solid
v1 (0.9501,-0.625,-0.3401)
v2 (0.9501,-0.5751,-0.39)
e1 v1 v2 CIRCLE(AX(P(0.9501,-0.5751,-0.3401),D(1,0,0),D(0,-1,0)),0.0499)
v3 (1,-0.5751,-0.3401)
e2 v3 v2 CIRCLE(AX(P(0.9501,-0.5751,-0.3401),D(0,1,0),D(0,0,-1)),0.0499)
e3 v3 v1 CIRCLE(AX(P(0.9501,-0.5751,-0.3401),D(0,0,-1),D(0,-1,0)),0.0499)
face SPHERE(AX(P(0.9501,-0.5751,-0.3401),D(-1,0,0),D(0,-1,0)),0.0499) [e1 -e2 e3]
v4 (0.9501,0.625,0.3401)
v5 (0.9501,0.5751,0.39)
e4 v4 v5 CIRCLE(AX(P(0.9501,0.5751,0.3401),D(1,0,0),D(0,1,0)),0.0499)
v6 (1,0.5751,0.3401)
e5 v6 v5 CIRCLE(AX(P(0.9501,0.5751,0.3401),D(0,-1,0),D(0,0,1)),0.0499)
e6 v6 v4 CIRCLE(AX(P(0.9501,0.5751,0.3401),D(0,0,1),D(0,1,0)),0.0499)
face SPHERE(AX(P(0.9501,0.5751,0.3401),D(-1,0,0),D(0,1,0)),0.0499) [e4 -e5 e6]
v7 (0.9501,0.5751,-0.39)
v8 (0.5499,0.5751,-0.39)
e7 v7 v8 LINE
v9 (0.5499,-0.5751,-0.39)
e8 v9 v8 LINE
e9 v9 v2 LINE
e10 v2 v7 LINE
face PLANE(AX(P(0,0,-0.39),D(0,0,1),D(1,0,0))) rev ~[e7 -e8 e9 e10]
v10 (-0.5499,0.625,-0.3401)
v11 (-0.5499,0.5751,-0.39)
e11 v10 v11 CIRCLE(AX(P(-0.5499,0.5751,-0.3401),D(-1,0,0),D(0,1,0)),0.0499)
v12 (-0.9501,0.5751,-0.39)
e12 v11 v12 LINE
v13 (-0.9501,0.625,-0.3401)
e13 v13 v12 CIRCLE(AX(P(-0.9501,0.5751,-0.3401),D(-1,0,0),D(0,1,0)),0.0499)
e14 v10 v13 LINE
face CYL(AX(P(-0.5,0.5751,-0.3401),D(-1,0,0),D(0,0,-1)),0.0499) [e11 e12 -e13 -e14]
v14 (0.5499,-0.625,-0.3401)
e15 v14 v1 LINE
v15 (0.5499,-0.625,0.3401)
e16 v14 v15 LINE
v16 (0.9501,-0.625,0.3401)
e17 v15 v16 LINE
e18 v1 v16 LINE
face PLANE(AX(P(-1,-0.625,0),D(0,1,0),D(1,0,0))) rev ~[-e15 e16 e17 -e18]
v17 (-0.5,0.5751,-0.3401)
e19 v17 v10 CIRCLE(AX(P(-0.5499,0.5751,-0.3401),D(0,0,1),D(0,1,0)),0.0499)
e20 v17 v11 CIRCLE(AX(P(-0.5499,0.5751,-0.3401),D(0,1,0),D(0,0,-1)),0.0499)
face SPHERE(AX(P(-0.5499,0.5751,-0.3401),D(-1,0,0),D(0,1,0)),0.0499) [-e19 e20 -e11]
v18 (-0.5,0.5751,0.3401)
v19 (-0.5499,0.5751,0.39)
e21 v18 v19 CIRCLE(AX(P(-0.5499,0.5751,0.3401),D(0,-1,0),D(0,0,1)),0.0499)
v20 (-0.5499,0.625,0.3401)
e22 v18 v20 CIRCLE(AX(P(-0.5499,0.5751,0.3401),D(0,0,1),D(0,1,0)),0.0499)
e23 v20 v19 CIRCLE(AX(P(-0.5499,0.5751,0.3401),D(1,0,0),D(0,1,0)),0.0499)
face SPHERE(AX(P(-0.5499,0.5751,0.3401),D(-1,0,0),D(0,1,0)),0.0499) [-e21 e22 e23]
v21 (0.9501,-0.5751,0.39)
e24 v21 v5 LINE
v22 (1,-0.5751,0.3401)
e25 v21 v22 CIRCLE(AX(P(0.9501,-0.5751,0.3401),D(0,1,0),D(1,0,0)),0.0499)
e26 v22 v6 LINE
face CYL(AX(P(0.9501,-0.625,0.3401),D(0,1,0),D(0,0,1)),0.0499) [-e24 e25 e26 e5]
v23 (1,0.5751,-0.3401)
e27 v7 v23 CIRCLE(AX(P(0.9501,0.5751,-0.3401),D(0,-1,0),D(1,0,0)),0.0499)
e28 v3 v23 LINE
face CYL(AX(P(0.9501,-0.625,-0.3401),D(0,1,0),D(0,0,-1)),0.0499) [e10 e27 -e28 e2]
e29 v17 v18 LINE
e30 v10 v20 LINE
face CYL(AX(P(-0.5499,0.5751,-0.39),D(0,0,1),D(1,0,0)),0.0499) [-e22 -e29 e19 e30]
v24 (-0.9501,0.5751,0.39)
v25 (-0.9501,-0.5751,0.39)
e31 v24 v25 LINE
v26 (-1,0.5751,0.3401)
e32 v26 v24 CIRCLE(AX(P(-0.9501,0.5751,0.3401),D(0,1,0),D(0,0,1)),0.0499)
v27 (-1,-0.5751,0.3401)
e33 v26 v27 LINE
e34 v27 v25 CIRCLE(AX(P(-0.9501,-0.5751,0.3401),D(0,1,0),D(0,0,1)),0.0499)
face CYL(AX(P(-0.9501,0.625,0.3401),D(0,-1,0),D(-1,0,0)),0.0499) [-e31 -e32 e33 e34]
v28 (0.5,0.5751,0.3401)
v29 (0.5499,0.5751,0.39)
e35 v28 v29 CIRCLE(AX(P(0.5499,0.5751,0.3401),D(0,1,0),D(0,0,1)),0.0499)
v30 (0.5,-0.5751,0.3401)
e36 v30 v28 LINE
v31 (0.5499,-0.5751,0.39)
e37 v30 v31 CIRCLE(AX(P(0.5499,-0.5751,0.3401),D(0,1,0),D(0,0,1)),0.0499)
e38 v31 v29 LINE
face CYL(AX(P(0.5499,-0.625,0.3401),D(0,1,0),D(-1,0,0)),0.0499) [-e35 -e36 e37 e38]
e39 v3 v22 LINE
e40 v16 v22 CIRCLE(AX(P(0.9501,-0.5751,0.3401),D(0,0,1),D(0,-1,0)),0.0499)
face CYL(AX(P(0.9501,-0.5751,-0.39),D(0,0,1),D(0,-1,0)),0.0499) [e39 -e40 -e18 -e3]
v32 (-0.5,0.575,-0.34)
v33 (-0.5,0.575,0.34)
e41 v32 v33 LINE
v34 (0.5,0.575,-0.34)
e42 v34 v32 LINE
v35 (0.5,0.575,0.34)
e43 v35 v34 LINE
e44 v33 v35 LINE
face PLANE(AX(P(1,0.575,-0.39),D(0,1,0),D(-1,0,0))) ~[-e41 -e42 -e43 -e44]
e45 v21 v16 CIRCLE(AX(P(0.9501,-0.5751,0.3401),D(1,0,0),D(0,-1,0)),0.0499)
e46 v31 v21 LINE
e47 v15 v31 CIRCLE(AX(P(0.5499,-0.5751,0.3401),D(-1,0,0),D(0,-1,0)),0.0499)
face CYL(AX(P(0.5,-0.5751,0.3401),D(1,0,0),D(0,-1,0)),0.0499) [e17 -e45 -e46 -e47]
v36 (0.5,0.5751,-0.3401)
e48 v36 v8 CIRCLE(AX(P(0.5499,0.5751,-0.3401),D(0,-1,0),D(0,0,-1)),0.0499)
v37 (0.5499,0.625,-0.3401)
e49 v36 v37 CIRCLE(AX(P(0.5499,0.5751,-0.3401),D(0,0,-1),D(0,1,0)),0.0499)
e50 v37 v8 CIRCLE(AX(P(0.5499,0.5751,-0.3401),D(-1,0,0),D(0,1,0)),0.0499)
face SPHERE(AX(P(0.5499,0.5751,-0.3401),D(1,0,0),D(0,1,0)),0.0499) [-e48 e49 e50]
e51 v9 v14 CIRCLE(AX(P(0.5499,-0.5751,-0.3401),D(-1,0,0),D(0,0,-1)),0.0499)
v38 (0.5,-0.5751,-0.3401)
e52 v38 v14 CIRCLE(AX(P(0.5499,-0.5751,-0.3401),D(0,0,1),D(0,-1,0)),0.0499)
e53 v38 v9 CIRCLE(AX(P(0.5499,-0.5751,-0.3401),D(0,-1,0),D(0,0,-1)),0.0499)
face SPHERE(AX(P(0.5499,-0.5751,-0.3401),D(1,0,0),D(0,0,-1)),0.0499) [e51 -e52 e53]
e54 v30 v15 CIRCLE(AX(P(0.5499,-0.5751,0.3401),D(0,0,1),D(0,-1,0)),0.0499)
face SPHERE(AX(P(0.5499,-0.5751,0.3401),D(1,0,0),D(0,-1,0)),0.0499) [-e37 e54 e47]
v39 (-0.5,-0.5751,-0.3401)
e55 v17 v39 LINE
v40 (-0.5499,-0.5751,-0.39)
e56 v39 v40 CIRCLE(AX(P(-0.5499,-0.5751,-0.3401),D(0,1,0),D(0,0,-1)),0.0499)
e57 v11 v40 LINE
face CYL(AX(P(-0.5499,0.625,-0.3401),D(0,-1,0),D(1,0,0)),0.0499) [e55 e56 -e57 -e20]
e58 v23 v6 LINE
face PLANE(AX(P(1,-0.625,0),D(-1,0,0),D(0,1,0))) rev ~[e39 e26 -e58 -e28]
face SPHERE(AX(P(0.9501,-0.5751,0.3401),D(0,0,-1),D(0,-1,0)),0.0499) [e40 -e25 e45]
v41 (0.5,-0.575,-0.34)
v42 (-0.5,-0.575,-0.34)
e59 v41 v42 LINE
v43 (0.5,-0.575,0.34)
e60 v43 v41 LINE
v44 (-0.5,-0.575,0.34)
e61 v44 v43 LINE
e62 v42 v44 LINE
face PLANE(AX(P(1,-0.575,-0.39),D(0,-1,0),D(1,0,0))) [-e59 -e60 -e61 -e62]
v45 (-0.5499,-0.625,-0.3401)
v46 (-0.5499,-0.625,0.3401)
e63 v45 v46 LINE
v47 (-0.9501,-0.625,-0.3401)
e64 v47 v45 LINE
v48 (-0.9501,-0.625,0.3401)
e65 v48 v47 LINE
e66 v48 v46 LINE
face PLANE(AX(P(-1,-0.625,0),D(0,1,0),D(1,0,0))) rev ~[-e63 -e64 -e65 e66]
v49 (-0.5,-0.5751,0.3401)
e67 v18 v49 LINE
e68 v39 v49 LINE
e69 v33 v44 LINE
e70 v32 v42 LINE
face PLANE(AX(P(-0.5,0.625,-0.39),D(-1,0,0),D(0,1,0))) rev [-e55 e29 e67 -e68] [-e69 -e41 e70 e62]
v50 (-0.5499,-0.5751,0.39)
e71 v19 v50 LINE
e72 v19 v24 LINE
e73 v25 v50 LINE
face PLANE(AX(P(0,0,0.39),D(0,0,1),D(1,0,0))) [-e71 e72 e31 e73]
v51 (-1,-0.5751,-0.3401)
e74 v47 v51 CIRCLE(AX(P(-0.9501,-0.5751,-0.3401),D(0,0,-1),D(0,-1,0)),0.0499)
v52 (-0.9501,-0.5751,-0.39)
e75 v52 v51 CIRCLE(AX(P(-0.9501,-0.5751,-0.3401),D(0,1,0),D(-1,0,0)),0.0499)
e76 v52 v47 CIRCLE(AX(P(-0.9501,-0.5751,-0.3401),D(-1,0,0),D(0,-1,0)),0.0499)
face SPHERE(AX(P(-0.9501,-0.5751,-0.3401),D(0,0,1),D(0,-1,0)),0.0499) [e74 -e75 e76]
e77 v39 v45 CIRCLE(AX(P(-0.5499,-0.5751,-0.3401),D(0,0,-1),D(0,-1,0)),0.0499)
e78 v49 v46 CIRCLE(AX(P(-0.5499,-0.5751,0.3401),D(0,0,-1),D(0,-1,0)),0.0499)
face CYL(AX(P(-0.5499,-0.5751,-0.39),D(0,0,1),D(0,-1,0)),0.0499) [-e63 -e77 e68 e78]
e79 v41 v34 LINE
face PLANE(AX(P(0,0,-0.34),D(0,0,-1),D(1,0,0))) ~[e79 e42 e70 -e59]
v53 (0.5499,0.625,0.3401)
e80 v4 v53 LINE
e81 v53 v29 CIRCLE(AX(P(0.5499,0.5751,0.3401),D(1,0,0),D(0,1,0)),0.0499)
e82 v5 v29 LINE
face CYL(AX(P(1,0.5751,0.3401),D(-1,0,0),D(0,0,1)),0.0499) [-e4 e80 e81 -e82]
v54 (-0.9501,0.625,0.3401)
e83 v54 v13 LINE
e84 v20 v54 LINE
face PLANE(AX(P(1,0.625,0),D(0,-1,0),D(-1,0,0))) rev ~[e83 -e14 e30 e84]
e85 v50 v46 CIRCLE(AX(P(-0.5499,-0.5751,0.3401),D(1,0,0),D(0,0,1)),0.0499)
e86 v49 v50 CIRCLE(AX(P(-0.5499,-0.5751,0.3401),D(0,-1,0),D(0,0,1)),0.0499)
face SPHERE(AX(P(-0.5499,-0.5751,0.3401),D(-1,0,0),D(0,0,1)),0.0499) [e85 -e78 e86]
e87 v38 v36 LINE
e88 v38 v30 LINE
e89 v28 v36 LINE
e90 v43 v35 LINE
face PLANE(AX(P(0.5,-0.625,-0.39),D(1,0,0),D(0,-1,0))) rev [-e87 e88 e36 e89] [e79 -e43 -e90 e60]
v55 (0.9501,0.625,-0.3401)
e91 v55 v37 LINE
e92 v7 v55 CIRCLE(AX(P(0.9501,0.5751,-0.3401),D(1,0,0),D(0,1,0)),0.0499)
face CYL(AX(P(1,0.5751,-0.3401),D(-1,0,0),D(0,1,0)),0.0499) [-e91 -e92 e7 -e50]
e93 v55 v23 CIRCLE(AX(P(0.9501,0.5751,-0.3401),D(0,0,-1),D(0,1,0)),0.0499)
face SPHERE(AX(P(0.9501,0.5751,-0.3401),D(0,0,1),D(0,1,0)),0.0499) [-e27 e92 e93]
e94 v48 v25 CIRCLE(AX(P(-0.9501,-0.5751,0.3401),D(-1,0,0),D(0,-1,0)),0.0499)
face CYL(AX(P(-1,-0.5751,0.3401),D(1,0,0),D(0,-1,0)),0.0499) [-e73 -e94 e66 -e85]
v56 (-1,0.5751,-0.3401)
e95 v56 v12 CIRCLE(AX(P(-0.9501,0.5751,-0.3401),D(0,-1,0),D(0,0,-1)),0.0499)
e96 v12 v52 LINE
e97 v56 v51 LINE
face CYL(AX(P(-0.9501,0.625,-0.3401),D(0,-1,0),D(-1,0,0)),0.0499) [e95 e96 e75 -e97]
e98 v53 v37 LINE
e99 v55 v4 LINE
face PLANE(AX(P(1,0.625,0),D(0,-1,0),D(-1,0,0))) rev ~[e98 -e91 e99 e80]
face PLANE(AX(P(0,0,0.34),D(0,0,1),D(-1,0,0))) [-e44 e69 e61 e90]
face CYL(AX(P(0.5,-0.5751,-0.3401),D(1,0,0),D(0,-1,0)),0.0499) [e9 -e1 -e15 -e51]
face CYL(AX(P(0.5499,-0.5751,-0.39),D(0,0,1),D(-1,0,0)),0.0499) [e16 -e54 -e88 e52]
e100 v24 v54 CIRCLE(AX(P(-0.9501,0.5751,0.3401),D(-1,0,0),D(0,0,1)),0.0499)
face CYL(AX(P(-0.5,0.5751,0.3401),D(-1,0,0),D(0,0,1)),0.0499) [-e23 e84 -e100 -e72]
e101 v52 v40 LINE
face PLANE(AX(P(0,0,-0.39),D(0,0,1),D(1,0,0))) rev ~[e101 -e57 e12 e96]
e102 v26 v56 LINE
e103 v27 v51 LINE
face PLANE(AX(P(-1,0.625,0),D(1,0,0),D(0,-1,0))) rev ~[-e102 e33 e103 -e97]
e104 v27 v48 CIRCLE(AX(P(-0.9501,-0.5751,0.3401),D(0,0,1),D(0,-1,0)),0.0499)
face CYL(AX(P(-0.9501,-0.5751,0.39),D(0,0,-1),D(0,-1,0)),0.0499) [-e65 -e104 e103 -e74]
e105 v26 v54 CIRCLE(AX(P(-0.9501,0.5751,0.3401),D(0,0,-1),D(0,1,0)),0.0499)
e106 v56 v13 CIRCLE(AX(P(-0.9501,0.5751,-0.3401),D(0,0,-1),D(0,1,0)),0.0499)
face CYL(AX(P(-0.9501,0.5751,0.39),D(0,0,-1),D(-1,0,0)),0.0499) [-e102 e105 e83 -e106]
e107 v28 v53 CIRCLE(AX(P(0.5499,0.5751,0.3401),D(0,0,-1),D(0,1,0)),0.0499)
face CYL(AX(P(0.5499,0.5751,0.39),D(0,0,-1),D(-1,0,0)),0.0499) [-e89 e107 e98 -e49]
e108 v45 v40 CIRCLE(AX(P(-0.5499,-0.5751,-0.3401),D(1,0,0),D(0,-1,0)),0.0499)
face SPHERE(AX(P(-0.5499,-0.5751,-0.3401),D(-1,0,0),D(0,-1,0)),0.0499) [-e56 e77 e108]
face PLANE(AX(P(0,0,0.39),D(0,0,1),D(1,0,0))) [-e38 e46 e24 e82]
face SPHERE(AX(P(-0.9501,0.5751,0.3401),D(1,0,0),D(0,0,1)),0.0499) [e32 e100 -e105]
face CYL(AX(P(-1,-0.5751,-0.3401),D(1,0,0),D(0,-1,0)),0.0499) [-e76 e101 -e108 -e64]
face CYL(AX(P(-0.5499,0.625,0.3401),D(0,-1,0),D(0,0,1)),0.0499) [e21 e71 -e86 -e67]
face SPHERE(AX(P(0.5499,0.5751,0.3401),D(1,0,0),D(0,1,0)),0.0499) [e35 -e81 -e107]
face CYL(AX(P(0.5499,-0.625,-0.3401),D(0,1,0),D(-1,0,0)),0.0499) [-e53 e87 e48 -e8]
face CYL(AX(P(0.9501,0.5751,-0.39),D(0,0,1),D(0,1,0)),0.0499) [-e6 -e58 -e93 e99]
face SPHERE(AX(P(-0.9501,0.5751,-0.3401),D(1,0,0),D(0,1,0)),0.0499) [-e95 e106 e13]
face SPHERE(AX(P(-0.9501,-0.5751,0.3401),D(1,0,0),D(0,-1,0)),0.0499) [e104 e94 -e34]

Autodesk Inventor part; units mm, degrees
ref_plane "YZ Plane" through (0, 0, 0) normal (1, 0, 0) x (0, 1, 0)
ref_plane "XZ Plane" through (0, 0, 0) normal (0, 1, 0) x (-1, 0, 0)
ref_plane "XY Plane" through (0, 0, 0) normal (0, 0, 1) x (1, 0, 0)
sketch "Sketch1" plane through (0, 0, 0) normal (0, 0, 1) x (1, 0, 0)
  line L0 (1, 0.625) -> (-1, 0.625)
  line L1 (-1, 0.625) -> (-1, -0.625)
  line L2 (-1, -0.625) -> (1, -0.625)
  line L3 (1, -0.625) -> (1, 0.625)
  line L4 (1, 0.625) -> (-1, -0.625) construction
  line L5 (-1, 0.625) -> (1, -0.625) construction
  point P0 (0, 0)
  dimension "d0" = 2
  dimension "d1" = 1.25
sketch "Sketch1 outline for Extrusion1" plane through (0, 0, 0) normal (0, 0, 1) x (1, 0, 0)
  line L0 (1, -0.625) -> (1, 0.625)
  line L1 (-1, -0.625) -> (1, -0.625)
  line L2 (-1, 0.625) -> (-1, -0.625)
  line L3 (1, 0.625) -> (-1, 0.625)
extrude "Extrusion1" add sketch "Sketch1 outline for Extrusion1" along normal mid plane 0.78
sketch "Sketch2" plane through (0, 0, 0.39) normal (0, 0, 1) x (-1, 0, 0)
  line L0 (0.5, 0.624281) -> (0.5, -0.625)
  line L1 (-0.5, 0.625) -> (-0.5, -0.625)
  line L2 (-0.5, 0.625) -> (0.5, 0.625)
  line L3 (0.5, 0.625) -> (0.5, -0.625)
  line L4 (0.5, -0.625) -> (-0.5, -0.625)
  line L5 (-0.5, -0.625) -> (-0.5, 0.625)
  line L6 (-1, -0.625) -> (1, -0.625)
  line L7 (1, 0.625) -> (-1, 0.625)
  line L8 (1, -0.625) -> (1, 0.625)
  line L9 (-1, 0.625) -> (-1, -0.625)
  point P0 (0, 0)
  dimension "d11" = 0.5
  dimension "d12" = 0.5
sketch "Sketch2 outline for Extrusion2" plane through (0, 0, 0.39) normal (0, 0, 1) x (-1, 0, 0)
  line L0 (-0.5, -0.625) -> (0.5, -0.625)
  line L1 (-0.5, 0.625) -> (-0.5, -0.625)
  line L2 (0.5, 0.625) -> (-0.5, 0.625)
  line L3 (0.5, -0.625) -> (0.5, 0.625)
extrude "Extrusion2" cut sketch "Sketch2 outline for Extrusion2" against normal blind 0.05
mirror "Mirror1" about plane through (0, 0, 0) normal (0, 0, 1) of "Extrusion2"
sketch "Sketch3" plane through (1, -0.625, -0.39) normal (0, -1, 0) x (1, 0, 0)
  line L0 (-1.5, 0.73) -> (-0.5, 0.73)
  line L1 (-0.5, 0.73) -> (-0.5, 0.05)
  line L2 (-0.5, 0.05) -> (-1.5, 0.05)
  line L3 (-1.5, 0.05) -> (-1.5, 0.73)
  point P0 (-1, 0.39)
sketch "Sketch3 outline for Extrusion3" plane through (1, -0.625, -0.39) normal (0, -1, 0) x (1, 0, 0)
  line L0 (-1.5, 0.73) -> (-0.5, 0.73)
  line L1 (-0.5, 0.73) -> (-0.5, 0.05)
  line L2 (-0.5, 0.05) -> (-1.5, 0.05)
  line L3 (-1.5, 0.05) -> (-1.5, 0.73)
extrude "Extrusion3" cut sketch "Sketch3 outline for Extrusion3" against normal blind 0.05
mirror "Mirror2" about plane through (0, 0, 0) normal (0, 1, 0) of "Extrusion3"
fillet "Fillet1" radius 0.05 24 edges at (0.75, 0.625, 0.39) (1, 0.625, 0) (0.75, 0.625, -0.39) (0.75, -0.625, -0.39) (1, -0.625, 0) (0.75, -0.625, 0.39) (-0.75, -0.625, 0.39) (-1, -0.625, 0) (-0.75, -0.625, -0.39) (1, 0, -0.39) (1, 0, 0.39) (-0.75, 0.625, 0.39) (-1, 0, 0.39) (-0.75, 0.625, -0.39) (-1, 0.625, 0) (-1, 0, -0.39) (-0.5, 0.625, 0) (-0.5, 0, 0.39) (-0.5, -0.625, 0) (-0.5, 0, -0.39) (0.5, 0.625, 0) (0.5, 0, -0.39) (0.5, -0.625, 0) (0.5, 0, 0.39)
properties part number "C0805C102K5RACTU"
